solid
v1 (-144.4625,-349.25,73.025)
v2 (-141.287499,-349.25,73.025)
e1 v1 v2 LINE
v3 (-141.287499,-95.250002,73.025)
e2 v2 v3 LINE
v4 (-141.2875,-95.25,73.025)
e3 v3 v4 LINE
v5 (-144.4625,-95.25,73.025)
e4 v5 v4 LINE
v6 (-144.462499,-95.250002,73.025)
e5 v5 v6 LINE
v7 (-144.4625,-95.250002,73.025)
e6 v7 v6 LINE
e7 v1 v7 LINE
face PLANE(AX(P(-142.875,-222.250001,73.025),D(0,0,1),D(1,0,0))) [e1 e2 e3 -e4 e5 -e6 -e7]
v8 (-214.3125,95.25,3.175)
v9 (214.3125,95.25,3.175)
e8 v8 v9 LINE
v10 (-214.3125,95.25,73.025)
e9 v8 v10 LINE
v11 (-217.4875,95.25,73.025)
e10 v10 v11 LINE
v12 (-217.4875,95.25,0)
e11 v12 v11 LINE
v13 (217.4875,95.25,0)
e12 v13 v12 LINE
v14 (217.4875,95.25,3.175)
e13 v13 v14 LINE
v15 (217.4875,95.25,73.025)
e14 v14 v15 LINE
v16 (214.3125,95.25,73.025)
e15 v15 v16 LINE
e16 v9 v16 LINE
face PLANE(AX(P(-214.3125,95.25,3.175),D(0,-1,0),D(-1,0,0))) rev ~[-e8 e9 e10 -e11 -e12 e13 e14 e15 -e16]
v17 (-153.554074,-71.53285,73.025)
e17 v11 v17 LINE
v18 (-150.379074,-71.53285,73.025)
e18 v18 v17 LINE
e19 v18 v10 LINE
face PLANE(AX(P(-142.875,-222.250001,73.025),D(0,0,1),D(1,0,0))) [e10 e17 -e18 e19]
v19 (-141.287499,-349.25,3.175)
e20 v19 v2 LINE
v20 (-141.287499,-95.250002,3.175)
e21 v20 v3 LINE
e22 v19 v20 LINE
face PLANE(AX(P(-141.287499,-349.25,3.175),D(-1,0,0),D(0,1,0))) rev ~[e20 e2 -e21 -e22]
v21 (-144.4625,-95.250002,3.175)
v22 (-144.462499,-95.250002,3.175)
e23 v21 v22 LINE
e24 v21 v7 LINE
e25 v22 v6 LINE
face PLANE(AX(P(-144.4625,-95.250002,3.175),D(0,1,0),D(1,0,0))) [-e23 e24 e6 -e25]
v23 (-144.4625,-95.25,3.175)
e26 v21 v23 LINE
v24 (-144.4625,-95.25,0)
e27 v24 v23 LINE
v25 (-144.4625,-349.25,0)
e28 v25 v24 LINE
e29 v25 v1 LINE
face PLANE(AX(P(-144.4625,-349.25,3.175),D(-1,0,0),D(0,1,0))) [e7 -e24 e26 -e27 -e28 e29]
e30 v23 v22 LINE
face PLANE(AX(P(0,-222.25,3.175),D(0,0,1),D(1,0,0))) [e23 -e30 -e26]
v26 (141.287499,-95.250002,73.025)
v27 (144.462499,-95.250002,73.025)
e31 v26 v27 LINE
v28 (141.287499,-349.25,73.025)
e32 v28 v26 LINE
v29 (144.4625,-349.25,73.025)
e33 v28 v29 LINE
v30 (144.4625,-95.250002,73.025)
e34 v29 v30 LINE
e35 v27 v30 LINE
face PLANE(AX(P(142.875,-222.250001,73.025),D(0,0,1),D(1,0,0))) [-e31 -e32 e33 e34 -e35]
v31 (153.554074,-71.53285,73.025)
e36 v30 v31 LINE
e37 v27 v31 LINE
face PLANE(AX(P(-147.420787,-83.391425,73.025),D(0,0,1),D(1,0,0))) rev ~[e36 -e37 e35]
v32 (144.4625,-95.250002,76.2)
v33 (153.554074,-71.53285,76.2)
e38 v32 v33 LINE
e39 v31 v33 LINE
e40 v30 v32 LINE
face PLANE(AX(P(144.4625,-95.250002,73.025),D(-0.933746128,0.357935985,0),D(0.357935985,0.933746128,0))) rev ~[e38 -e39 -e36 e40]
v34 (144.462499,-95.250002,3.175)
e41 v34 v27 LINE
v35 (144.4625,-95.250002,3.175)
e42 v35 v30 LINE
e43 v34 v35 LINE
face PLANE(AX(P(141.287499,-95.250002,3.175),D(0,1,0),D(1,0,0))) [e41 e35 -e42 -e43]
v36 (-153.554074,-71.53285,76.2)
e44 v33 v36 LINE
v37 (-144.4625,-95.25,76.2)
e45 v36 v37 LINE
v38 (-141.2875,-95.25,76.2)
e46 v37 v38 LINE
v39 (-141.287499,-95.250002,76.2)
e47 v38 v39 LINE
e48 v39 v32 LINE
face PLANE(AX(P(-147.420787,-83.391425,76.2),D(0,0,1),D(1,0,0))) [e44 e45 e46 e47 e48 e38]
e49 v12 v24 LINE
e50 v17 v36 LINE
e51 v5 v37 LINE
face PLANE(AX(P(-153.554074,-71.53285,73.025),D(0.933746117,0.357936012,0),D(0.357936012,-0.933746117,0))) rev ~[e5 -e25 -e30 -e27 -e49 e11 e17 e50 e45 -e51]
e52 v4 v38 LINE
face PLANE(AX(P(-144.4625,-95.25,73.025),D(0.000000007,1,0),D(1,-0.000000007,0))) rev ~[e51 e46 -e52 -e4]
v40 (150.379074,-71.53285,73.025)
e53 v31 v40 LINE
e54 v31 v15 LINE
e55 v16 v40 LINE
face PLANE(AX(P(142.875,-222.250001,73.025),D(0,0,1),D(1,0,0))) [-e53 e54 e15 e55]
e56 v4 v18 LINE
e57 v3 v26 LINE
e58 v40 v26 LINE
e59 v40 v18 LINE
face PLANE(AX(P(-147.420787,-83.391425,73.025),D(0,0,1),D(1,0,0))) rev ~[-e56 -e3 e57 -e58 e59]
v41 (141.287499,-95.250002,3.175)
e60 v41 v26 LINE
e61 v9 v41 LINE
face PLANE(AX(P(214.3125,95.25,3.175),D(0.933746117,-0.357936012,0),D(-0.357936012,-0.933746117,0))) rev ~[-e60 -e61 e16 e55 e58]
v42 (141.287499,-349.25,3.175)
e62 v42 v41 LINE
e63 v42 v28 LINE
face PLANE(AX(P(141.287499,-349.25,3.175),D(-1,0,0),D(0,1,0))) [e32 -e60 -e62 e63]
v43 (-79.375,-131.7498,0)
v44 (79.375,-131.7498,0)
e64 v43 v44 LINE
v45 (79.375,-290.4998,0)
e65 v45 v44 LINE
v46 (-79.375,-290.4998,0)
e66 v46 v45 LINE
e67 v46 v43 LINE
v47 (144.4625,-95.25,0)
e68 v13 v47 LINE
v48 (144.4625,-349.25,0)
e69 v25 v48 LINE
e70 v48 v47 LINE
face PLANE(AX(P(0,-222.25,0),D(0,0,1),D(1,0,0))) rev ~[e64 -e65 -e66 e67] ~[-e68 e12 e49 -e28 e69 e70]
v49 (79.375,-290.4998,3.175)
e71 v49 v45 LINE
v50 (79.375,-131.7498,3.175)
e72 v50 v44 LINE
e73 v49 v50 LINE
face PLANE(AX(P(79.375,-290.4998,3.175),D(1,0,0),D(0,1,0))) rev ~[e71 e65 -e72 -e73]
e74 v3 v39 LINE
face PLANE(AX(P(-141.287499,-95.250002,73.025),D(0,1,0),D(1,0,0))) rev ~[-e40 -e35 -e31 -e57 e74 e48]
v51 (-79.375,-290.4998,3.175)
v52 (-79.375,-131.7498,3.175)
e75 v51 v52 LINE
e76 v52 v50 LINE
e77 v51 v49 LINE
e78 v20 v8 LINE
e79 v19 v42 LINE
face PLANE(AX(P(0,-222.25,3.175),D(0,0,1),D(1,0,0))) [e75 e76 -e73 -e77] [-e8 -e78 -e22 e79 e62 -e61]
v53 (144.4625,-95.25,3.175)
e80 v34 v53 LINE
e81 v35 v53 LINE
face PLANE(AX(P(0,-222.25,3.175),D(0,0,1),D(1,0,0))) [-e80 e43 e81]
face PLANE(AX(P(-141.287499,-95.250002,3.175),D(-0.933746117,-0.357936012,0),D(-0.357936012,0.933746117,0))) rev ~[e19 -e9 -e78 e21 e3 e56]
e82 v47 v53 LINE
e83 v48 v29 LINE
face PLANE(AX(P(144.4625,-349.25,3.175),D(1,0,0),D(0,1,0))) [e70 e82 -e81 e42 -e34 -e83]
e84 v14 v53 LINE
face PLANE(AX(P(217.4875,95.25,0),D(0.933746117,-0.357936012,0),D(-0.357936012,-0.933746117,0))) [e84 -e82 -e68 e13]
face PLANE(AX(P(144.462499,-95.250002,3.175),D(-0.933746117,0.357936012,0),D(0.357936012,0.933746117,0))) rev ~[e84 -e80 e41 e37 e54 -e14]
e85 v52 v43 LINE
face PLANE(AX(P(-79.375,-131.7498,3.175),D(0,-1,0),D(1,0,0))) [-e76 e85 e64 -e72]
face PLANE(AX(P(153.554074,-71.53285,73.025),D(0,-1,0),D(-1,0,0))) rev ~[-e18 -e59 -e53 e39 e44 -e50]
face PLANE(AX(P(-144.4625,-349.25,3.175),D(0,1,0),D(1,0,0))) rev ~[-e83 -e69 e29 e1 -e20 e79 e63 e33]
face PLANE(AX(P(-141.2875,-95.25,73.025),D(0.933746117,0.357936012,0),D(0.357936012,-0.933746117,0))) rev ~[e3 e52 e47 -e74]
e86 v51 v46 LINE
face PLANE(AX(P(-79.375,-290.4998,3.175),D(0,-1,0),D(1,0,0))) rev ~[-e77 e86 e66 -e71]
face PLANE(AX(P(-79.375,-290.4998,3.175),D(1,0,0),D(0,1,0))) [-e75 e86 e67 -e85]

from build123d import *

# Parameters (mm, degrees)
F0_W      = 288.925
F0_H      = 190.5
F1_DEPTH  = 3.175
F3_DEPTH  = 3.175
F5_DEPTH  = 3.175
F6_W      = 288.925
F6_H      = 254
F7_DEPTH  = 3.175
F8_W      = 158.75
F8_H      = 158.75
F9_DEPTH  = 3.175
F12_DEPTH = 69.85
F13_W     = 3.1750007891
F13_H     = 253.9999979416
F13_W_2   = 3.1750009115
F13_H_2   = 253.9999979885
F14_DEPTH = 69.85
F16_DEPTH = 3.175


# Not quite as in the source:
# - ends of sketch curves that miss each other by under 0.0002 mm in the source are joined


with BuildPart() as f1:
    # F0 (on Top) → F1 (new body)
    with BuildSketch(Plane.XY):
        Rectangle(F0_W, F0_H)
    extrude(amount=F1_DEPTH)

    # F2 (on face) → F3 (join)
    with BuildSketch(Plane.XY.offset(3.175)):
        Polygon((-144.4625, -95.25), (-144.4625, 95.25), (-217.4875, 95.25), align=None)
    extrude(amount=-F3_DEPTH)

    # F4 (on face) → F5 (join)
    with BuildSketch(Plane(origin=(0, 0, 0), x_dir=(1, 0, 0), z_dir=(0, 0, -1))):
        Polygon((217.4875, -95.25), (144.4625, 95.25), (144.4625, -95.25), align=None)
    extrude(amount=-F5_DEPTH)

    # F6 (on face) → F7 (join)
    with BuildSketch(Plane.XY.offset(3.175)):
        with Locations((0, -222.25)):
            Rectangle(F6_W, F6_H)
    extrude(amount=-F7_DEPTH)

    # F8 (on face) → F9 (cut)
    with BuildSketch(Plane.XY.offset(3.175)):
        with Locations((0, -211.1248)):
            Rectangle(F8_W, F8_H)
    extrude(amount=-F9_DEPTH, mode=Mode.SUBTRACT)

    # F10 (on face) + F11 (on face) → F12 (join)
    with BuildSketch(Plane.XY.offset(3.175)):
        Polygon((-214.3125, 95.25), (-217.4875, 95.25), (-144.4624992109, -95.2500020584), (-141.2874992109, -95.2500020584), align=None)
    with BuildSketch(Plane.XY.offset(3.175)):
        Polygon((144.4624990885, -95.2500020115), (217.4875, 95.25), (214.3125, 95.25), (141.2874990885, -95.2500020115), align=None)
    extrude(amount=F12_DEPTH)

    # F13 (on face) → F14 (join)
    with BuildSketch(Plane.XY.offset(3.175)):
        with Locations((-142.8749996055, -222.2500010292)):
            Rectangle(F13_W, F13_H)
        with Locations((142.8749995443, -222.2500010058)):
            Rectangle(F13_W_2, F13_H_2)
    extrude(amount=F14_DEPTH)

    # F15 (on face) → F16 (join)
    with BuildSketch(Plane.XY.offset(73.025)):
        Polygon((-153.5540740075, -71.5328504152), (-144.4625, -95.25), (-141.2874992109, -95.2500000226), (-150.3790740075, -71.5328504152), align=None)
        Polygon((-150.3790740075, -71.5328504152), (-141.2874992109, -95.2500020584), (144.4625, -95.2500020584), (153.5540740075, -71.5328504152), align=None)
    extrude(amount=F16_DEPTH)


solid = f1.part
